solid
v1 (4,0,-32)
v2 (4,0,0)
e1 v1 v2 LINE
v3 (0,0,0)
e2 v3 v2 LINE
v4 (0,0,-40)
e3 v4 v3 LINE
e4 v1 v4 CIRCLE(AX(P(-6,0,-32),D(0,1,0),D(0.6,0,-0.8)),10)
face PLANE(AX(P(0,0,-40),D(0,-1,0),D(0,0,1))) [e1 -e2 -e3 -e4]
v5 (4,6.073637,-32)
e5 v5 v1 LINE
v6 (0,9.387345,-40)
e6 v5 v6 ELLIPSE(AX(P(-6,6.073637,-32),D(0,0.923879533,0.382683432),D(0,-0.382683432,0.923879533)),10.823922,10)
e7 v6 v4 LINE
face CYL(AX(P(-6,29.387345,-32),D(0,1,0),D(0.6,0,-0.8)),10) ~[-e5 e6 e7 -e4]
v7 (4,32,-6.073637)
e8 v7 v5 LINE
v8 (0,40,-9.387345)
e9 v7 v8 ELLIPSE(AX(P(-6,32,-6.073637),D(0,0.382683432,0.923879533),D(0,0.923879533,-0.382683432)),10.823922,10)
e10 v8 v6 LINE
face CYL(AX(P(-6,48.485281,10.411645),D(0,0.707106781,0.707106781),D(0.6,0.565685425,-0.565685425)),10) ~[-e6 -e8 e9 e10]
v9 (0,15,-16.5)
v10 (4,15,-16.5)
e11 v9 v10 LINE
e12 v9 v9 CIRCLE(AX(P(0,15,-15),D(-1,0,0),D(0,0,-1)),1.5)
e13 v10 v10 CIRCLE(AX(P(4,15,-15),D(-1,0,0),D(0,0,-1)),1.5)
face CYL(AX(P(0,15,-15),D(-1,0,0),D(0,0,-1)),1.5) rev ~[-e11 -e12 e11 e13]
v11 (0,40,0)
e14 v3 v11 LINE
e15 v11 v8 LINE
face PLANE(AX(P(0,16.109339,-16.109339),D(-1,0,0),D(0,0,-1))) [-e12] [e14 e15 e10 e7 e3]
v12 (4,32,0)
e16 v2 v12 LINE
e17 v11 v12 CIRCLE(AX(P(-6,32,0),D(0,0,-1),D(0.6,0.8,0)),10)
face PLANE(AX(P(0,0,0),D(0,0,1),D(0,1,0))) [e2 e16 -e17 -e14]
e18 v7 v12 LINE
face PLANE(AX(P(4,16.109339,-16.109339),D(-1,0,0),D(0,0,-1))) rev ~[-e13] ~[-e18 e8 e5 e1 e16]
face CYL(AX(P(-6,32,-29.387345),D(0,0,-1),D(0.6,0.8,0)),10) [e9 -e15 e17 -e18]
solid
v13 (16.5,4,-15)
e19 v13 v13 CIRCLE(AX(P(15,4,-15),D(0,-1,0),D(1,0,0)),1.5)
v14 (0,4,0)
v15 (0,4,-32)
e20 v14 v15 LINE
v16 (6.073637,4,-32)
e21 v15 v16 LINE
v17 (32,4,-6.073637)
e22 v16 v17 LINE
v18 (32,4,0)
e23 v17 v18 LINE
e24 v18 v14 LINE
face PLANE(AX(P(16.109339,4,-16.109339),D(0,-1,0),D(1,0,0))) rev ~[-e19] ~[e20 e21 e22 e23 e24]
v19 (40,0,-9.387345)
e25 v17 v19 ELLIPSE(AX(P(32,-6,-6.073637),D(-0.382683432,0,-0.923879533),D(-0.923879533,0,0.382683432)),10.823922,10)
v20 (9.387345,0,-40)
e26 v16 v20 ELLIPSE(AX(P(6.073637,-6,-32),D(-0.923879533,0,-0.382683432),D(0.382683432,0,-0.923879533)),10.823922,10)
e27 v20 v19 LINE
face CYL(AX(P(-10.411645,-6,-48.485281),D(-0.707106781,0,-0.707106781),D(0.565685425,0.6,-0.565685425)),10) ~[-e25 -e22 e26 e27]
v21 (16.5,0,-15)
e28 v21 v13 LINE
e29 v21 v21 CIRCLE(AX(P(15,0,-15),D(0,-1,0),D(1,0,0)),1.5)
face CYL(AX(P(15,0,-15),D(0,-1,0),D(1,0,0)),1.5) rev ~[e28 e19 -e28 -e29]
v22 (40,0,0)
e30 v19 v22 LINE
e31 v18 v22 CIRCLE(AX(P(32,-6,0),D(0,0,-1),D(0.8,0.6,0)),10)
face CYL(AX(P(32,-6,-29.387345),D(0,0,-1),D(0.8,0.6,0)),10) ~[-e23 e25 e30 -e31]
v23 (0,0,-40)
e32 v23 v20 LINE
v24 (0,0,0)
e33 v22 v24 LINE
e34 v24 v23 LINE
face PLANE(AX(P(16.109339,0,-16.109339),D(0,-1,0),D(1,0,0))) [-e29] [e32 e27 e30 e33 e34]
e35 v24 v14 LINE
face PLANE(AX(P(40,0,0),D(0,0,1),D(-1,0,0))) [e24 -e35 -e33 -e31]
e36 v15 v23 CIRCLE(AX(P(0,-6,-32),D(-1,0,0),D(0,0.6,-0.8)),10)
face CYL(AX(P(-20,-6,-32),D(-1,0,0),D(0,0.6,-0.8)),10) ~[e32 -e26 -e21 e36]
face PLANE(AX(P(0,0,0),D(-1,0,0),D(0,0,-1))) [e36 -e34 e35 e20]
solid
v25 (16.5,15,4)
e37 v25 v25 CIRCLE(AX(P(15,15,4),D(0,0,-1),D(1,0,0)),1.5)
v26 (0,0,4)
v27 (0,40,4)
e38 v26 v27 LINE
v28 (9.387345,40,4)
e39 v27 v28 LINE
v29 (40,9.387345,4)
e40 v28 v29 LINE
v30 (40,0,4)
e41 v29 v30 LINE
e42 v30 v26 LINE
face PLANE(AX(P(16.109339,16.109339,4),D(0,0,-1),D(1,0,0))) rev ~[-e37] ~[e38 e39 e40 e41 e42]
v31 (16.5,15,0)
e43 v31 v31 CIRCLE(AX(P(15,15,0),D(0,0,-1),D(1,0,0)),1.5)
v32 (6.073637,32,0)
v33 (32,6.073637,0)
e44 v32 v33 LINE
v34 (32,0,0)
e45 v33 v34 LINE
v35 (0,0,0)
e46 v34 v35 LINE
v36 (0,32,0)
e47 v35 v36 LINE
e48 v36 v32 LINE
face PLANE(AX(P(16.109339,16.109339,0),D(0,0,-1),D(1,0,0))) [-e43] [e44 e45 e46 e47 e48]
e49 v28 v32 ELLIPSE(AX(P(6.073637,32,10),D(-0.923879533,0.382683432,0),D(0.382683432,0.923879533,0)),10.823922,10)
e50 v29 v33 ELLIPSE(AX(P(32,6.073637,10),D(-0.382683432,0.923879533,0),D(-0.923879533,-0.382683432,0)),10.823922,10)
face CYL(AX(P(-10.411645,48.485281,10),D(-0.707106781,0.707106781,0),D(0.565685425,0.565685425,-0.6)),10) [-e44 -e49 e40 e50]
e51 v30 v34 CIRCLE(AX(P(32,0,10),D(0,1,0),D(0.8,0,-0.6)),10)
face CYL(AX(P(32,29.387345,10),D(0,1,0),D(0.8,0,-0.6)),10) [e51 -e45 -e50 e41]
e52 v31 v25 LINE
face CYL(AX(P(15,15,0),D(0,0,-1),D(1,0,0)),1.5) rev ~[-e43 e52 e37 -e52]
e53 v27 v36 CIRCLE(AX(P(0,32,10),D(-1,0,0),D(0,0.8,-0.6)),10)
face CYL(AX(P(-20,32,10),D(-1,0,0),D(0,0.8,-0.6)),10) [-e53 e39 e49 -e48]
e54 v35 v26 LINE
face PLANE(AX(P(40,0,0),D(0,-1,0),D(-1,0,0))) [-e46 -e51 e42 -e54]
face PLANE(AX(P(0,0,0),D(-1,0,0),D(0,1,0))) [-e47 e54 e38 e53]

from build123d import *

# Parameters (mm, degrees)
F0_R          = 1.5
F1_DEPTH      = 4
F2_ANGLE      = 90
F3_ANGLE      = 90
F4_T1_DEPTH   = 83.2928317533
F4_T3_DEPTH   = 49.3873450905
F4_T5_DEPTH   = 49.3873450905
F4_2_T1_DEPTH = 83.2928317533
F4_2_T3_DEPTH = 49.3873450905
F4_2_T5_DEPTH = 49.3873450905
F4_3_T1_DEPTH = 83.2928317533
F4_3_T3_DEPTH = 49.3873450905
F4_3_T5_DEPTH = 49.3873450905


# Not quite as in the source:
# - a fillet or chamfer that OpenCascade refuses, or shapes differently, is made with other operations: its cross-section is extruded or revolved along the edge and cut away or added


with BuildPart() as f1:
    # F0 (on Front) → F1 (new body)
    with BuildSketch(Plane.XZ):
        Polygon((40, 0), (0, 0), (0, -40), (9.3873450905, -40), (40, -9.3873450905), align=None)
        with Locations((15, -15)):
            Circle(F0_R, mode=Mode.SUBTRACT)
    extrude(amount=-F1_DEPTH)


with BuildPart() as f2_1:
    # F2: copy of F1
    add(f1.part.rotate(Axis((20, 0, 0), (1, 0, 0)), F2_ANGLE))


with BuildPart() as f3_1:
    # F3: copy of F2_1
    add(f2_1.part.rotate(Axis((0, 20, 0), (0, 1, 0)), F3_ANGLE))

    # F4#3: fillet of radius 10 on 3 edges, made by hand

    # F4_3_s2 → F4_3_t1 (cut)
    with BuildSketch(Plane(origin=(0, 29.4484630785, 29.4484630785), x_dir=(1, 0, 0), z_dir=(0, -0.7071067812, -0.7071067812))):
        with BuildLine():
            ThreePointArc((0, -34.9221266183), (2.94427191, -31.3942625733), (4, -26.9221266183))
            Line((4, -26.9221266183), (4, -34.9221266183))
            Line((4, -34.9221266183), (0, -34.9221266183))
        make_face()
    extrude(amount=F4_3_T1_DEPTH, mode=Mode.SUBTRACT)

    # F4_3_s4 → F4_3_t3 (cut)
    with BuildSketch(Plane.XZ.offset(-29.3873450905)):
        with BuildLine():
            ThreePointArc((0, -40), (2.94427191, -36.472135955), (4, -32))
            Line((4, -32), (4, -40))
            Line((4, -40), (0, -40))
        make_face()
    extrude(amount=F4_3_T3_DEPTH, mode=Mode.SUBTRACT)

    # F4_3_s6 → F4_3_t5 (cut)
    with BuildSketch(Plane.XY.offset(-29.3873450905)):
        with BuildLine():
            ThreePointArc((0, 40), (2.94427191, 36.472135955), (4, 32))
            Line((4, 32), (4, 40))
            Line((4, 40), (0, 40))
        make_face()
    extrude(amount=F4_3_T5_DEPTH, mode=Mode.SUBTRACT)


with BuildPart() as f1_1:
    add(f1.part)

    # F4: fillet of radius 10 on 3 edges, made by hand

    # F4_s2 → F4_t1 (cut)
    with BuildSketch(Plane(origin=(-29.4484630785, 0, -29.4484630785), x_dir=(0, 1, 0), z_dir=(0.7071067812, 0, 0.7071067812))):
        with BuildLine():
            ThreePointArc((0, -34.9221266183), (2.94427191, -31.3942625733), (4, -26.9221266183))
            Line((4, -26.9221266183), (4, -34.9221266183))
            Line((4, -34.9221266183), (0, -34.9221266183))
        make_face()
    extrude(amount=F4_T1_DEPTH, mode=Mode.SUBTRACT)

    # F4_s4 → F4_t3 (cut)
    with BuildSketch(Plane.YZ.offset(-20)):
        with BuildLine():
            ThreePointArc((0, -40), (2.94427191, -36.472135955), (4, -32))
            Line((4, -32), (4, -40))
            Line((4, -40), (0, -40))
        make_face()
    extrude(amount=F4_T3_DEPTH, mode=Mode.SUBTRACT)

    # F4_s6 → F4_t5 (cut)
    with BuildSketch(Plane.XY.offset(-29.3873450905)):
        with BuildLine():
            ThreePointArc((40, 0), (36.472135955, 2.94427191), (32, 4))
            Line((32, 4), (40, 4))
            Line((40, 4), (40, 0))
        make_face()
    extrude(amount=F4_T5_DEPTH, mode=Mode.SUBTRACT)


with BuildPart() as f2_1_1:
    add(f2_1.part)

    # F4#2: fillet of radius 10 on 3 edges, made by hand

    # F4_2_s2 → F4_2_t1 (cut)
    with BuildSketch(Plane(origin=(-29.4484630785, 29.4484630785, 0), x_dir=(0, 0, 1), z_dir=(0.7071067812, -0.7071067812, 0))):
        with BuildLine():
            ThreePointArc((4, -34.9221266183), (1.05572809, -31.3942625733), (0, -26.9221266183))
            Line((0, -26.9221266183), (0, -34.9221266183))
            Line((0, -34.9221266183), (4, -34.9221266183))
        make_face()
    extrude(amount=F4_2_T1_DEPTH, mode=Mode.SUBTRACT)

    # F4_2_s4 → F4_2_t3 (cut)
    with BuildSketch(Plane.YZ.offset(-20)):
        with BuildLine():
            ThreePointArc((40, 4), (36.472135955, 1.05572809), (32, 0))
            Line((32, 0), (40, 0))
            Line((40, 0), (40, 4))
        make_face()
    extrude(amount=F4_2_T3_DEPTH, mode=Mode.SUBTRACT)

    # F4_2_s6 → F4_2_t5 (cut)
    with BuildSketch(Plane.XZ.offset(-29.3873450905)):
        with BuildLine():
            ThreePointArc((40, 4), (36.472135955, 1.05572809), (32, 0))
            Line((32, 0), (40, 0))
            Line((40, 0), (40, 4))
        make_face()
    extrude(amount=F4_2_T5_DEPTH, mode=Mode.SUBTRACT)


solid = Compound([f3_1.part, f1_1.part, f2_1_1.part])
